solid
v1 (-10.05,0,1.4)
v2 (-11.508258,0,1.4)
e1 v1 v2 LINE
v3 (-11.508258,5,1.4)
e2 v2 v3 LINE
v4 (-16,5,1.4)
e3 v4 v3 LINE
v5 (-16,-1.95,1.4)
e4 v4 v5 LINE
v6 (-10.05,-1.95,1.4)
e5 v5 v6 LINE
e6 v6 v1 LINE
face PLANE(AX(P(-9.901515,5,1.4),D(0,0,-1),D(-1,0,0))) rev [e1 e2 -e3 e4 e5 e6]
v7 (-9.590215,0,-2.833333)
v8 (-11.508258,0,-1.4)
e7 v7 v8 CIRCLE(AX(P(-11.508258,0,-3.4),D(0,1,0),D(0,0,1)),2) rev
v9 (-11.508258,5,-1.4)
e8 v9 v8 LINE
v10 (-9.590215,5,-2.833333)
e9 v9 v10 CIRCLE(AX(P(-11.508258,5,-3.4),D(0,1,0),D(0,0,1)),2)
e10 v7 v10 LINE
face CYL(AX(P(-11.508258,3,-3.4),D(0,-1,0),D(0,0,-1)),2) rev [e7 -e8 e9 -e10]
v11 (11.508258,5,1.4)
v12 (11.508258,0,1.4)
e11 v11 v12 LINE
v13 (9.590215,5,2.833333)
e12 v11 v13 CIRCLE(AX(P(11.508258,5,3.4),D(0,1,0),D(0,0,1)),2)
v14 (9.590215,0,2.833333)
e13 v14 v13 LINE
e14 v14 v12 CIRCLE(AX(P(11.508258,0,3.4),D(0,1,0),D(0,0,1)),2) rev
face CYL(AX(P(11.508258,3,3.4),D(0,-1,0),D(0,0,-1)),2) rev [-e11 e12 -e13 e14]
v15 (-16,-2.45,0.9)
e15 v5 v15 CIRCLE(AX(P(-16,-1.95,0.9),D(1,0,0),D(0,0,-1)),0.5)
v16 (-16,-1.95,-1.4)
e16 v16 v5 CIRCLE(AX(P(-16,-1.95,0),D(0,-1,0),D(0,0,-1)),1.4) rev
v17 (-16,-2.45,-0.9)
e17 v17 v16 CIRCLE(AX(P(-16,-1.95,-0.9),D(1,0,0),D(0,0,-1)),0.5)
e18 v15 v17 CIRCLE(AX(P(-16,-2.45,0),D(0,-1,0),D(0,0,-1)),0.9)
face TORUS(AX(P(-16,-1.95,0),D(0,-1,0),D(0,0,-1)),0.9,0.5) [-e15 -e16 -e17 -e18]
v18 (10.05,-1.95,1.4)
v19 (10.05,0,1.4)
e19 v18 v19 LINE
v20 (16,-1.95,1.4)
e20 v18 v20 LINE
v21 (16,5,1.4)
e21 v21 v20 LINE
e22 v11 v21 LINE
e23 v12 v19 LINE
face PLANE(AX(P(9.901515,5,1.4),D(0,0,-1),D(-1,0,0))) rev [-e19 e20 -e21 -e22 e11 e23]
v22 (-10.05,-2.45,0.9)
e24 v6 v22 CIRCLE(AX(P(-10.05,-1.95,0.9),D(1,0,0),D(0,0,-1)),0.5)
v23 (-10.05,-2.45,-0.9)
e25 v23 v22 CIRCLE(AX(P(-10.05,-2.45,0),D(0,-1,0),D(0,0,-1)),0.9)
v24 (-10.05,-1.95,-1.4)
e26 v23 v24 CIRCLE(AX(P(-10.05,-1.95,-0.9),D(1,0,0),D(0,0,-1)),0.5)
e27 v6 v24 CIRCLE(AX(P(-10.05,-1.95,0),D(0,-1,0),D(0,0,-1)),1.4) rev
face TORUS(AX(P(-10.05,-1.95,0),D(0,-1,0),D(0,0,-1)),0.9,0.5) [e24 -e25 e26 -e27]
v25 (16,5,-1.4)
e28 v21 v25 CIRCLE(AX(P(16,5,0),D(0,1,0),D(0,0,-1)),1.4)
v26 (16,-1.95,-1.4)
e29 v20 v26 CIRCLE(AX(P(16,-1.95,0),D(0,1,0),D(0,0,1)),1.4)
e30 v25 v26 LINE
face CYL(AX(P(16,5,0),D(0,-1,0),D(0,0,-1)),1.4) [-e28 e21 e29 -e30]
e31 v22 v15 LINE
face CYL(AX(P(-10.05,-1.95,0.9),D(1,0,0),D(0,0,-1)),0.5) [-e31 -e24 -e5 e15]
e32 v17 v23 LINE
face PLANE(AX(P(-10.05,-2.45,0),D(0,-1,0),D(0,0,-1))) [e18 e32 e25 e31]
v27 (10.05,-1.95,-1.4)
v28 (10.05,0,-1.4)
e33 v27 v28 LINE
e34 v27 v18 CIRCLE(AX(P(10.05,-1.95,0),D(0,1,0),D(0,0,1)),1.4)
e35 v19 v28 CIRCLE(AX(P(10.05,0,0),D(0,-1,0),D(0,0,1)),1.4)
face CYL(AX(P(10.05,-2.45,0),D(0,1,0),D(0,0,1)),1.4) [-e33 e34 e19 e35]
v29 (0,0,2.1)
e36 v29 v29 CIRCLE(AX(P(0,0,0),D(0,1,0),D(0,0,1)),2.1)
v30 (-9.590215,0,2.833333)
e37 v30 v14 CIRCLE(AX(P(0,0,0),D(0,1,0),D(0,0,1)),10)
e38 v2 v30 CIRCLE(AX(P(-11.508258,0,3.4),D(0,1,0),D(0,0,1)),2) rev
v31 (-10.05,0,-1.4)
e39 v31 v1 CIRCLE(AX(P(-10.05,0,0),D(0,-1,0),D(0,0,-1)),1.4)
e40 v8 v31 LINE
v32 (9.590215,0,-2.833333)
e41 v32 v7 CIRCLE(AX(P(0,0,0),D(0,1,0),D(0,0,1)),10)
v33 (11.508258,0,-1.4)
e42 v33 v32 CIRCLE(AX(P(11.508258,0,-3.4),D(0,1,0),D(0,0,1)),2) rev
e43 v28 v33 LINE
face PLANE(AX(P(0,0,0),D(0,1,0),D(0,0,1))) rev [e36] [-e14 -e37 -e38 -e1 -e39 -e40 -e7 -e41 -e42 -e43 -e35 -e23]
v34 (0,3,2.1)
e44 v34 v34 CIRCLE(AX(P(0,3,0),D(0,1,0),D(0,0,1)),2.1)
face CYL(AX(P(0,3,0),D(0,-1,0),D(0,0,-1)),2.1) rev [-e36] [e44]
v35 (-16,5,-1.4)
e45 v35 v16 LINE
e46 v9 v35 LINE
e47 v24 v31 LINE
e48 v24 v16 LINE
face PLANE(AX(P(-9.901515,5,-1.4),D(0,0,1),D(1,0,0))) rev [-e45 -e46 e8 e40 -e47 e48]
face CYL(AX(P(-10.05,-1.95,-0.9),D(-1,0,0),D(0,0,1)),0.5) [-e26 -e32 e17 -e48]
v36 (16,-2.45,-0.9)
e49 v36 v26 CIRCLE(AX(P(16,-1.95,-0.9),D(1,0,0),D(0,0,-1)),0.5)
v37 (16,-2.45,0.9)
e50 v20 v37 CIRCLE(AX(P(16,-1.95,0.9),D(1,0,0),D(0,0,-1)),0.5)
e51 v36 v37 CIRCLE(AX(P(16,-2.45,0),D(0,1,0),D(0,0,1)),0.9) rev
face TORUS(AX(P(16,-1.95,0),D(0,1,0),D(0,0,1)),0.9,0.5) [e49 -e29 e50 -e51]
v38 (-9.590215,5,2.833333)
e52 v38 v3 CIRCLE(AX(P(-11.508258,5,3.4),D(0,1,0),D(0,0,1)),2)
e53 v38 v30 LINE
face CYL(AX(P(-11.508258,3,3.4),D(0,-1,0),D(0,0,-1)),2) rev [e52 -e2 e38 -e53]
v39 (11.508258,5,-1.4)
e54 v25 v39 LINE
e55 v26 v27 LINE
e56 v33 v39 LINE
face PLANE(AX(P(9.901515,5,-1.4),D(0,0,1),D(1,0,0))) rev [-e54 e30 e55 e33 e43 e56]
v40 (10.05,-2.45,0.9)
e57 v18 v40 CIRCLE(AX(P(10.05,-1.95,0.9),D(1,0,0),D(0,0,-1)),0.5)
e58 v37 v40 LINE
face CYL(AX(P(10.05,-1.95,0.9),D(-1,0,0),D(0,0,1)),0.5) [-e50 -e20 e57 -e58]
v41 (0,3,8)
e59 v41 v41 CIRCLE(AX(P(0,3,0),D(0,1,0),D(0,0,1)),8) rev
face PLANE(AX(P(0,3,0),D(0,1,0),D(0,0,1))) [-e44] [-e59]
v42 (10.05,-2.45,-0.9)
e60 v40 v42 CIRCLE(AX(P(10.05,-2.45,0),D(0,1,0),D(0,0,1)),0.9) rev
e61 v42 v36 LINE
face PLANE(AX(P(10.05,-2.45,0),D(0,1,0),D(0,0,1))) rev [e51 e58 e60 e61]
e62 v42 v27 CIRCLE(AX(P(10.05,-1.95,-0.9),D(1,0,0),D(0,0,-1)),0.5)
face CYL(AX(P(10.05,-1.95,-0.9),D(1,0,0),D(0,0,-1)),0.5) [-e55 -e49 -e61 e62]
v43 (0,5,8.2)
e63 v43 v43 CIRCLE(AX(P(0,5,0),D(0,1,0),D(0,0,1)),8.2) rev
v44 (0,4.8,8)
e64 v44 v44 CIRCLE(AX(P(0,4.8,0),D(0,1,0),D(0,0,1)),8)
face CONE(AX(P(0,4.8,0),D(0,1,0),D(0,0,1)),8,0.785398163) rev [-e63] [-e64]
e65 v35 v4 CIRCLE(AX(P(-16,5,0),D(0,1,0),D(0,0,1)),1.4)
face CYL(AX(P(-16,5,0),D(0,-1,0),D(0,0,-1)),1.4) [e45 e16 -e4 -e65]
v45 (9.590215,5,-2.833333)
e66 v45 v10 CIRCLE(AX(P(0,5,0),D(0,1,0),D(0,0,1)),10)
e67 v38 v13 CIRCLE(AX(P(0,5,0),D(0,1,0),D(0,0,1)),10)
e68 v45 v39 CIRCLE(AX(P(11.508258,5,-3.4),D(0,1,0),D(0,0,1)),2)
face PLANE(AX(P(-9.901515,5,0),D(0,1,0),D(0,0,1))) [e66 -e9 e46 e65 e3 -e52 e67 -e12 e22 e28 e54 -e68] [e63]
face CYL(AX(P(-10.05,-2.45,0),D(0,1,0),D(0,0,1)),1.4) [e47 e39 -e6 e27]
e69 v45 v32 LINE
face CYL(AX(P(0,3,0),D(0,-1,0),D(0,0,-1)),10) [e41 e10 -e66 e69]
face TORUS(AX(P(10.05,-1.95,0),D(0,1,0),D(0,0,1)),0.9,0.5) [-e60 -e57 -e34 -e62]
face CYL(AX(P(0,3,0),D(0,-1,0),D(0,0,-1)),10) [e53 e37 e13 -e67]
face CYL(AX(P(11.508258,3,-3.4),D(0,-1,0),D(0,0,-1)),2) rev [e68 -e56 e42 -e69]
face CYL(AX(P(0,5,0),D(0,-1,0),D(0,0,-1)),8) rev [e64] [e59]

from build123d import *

# Parameters (mm, degrees)
ESQUISSE1_R        = 10
ESQUISSE1_R_2      = 2.1
BOSS_EXTRU_1_DEPTH = 3
BOSS_EXTRU_2_DEPTH = 5
BOSS_EXTRU_3_START = 2.45
BOSS_EXTRU_3_DEPTH = 2.45
ESQUISSE4_R        = 10
ESQUISSE4_R_2      = 8
BOSS_EXTRU_4_DEPTH = 2
CONG_5_R           = 2
CONG_6_R           = 2
CONG_7_R           = 2
CONG_8_R           = 2
CONG_10_R          = 0.5
CHANFREIN1_SIZE    = 0.2


with BuildPart() as part:
    # Esquisse1 → Boss.-Extru.1 (new body)
    with BuildSketch(Plane(origin=(0, 0, 0), x_dir=(1, 0, 0), z_dir=(0, 1, 0))):
        with Locations(Location((0, 0, 0), (0, 0, 270))):
            Circle(ESQUISSE1_R)
        with Locations(Location((0, 0, 0), (0, 0, 270))):
            Circle(ESQUISSE1_R_2, mode=Mode.SUBTRACT)
    extrude(amount=BOSS_EXTRU_1_DEPTH)

    # Esquisse2 → Boss.-Extru.2 (add)
    with BuildSketch(Plane(origin=(0, 0, 0), x_dir=(1, 0, 0), z_dir=(0, 1, 0))):
        with BuildLine():
            Line((-9.901515036, -1.4), (-16, -1.4))
            ThreePointArc((-16, -1.4), (-17.4, 0), (-16, 1.4))
            Line((-16, 1.4), (-9.901515036, 1.4))
            ThreePointArc((-9.901515036, 1.4), (-8.501515036, 0), (-9.901515036, -1.4))
        make_face()
        with BuildLine():
            Line((9.901515036, -1.4), (16, -1.4))
            ThreePointArc((16, -1.4), (17.4, 0), (16, 1.4))
            Line((16, 1.4), (9.901515036, 1.4))
            ThreePointArc((9.901515036, 1.4), (8.501515036, 0), (9.901515036, -1.4))
        make_face()
    extrude(amount=BOSS_EXTRU_2_DEPTH)

    # Esquisse3 → Boss.-Extru.3 (add)
    with BuildSketch(Plane.XZ.offset(BOSS_EXTRU_3_START)):
        with BuildLine():
            Line((-10.05, -1.4), (-16, -1.4))
            ThreePointArc((-16, -1.4), (-17.4, 0), (-16, 1.4))
            Line((-16, 1.4), (-10.05, 1.4))
            ThreePointArc((-10.05, 1.4), (-8.65, 0), (-10.05, -1.4))
        make_face()
        with BuildLine():
            Line((10.05, -1.4), (16, -1.4))
            ThreePointArc((16, -1.4), (17.4, 0), (16, 1.4))
            Line((16, 1.4), (10.05, 1.4))
            ThreePointArc((10.05, 1.4), (8.65, 0), (10.05, -1.4))
        make_face()
    extrude(amount=-BOSS_EXTRU_3_DEPTH)

    # Esquisse4 → Boss.-Extru.4 (add)
    with BuildSketch(Plane(origin=(0, 3, 0), x_dir=(1, 0, 0), z_dir=(0, 1, 0))):
        Circle(ESQUISSE4_R)
        with Locations(Location((0, 0, 0), (0, 0, 270))):
            Circle(ESQUISSE4_R_2, mode=Mode.SUBTRACT)
    extrude(amount=BOSS_EXTRU_4_DEPTH)

    # Congé5
    # the kernel refuses this fillet: 2 mm, written as the material it adds along each edge
    with BuildSketch(Plane(origin=(9.901515036, 5, -1.4), x_dir=(1, 0, 0), z_dir=(0, -1, 0))) as cong_5_piece_1:
        with BuildLine():
            CenterArc((1.606742869, -2), CONG_5_R, 90, 73.540750372)
            ThreePointArc((-0.311300115, -1.433333333), (-0.129335377, -0.72238185), (0, 0))
            Line((0, 0), (1.606742869, 0))
        make_face()
    extrude(amount=5)

    # Congé6
    # the kernel refuses this fillet: 2 mm, written as the material it adds along each edge
    with BuildSketch(Plane(origin=(9.901515036, 0, 1.4), x_dir=(1, 0, 0), z_dir=(0, 1, 0))) as cong_6_piece_1:
        with BuildLine():
            CenterArc((1.606742869, -2), CONG_6_R, 90, 73.540750372)
            ThreePointArc((-0.311300115, -1.433333333), (-0.129335377, -0.72238185), (0, 0))
            Line((0, 0), (1.606742869, 0))
        make_face()
    extrude(amount=5)

    # Congé7
    # the kernel refuses this fillet: 2 mm, written as the material it adds along each edge
    with BuildSketch(Plane(origin=(-9.901515036, 5, -1.4), x_dir=(0.2122381850229741, 0, -0.9772179658695156), z_dir=(0, -1, 0))) as cong_7_piece_1:
        with BuildLine():
            CenterArc((1.613423741, -1.994614368), CONG_7_R, 94.20570169, 73.540750372)
            Line((-0.34101219, -1.570137998), (0, 0))
            ThreePointArc((0, 0), (0.733374428, -0.026928159), (1.466748856, 0))
        make_face()
    extrude(amount=5)

    # Congé8
    # the kernel refuses this fillet: 2 mm, written as the material it adds along each edge
    with BuildSketch(Plane(origin=(-9.901515036, 5, 1.4), x_dir=(0.21223818502297503, 0, 0.9772179658695155), z_dir=(0, -1, 0))) as cong_8_piece_1:
        with BuildLine():
            CenterArc((1.613423741, 1.994614368), CONG_8_R, 192.253547938, 73.540750372)
            Line((-0.34101219, 1.570137998), (0, 0))
            ThreePointArc((0, 0), (0.733374428, 0.026928159), (1.466748856, 0))
        make_face()
    extrude(amount=5)

    # Congé10
    cong_10_edges = [part.edges().sort_by_distance(p)[0] for p in [
        (-8.65, -2.45, 0),
        (-13.025, -2.45, 1.4),
        (-17.4, -2.45, 0),
        (-13.025, -2.45, -1.4),
        (8.65, -2.45, 0),
        (13.025, -2.45, -1.4),
        (17.4, -2.45, 0),
        (13.025, -2.45, 1.4),
    ]]
    fillet(cong_10_edges, radius=CONG_10_R)

    # Chanfrein1
    chanfrein1_edges = [part.edges().sort_by_distance(p)[0] for p in [
        (0, 5, -8),
    ]]
    chamfer(chanfrein1_edges, length=CHANFREIN1_SIZE)


solid = part.part
